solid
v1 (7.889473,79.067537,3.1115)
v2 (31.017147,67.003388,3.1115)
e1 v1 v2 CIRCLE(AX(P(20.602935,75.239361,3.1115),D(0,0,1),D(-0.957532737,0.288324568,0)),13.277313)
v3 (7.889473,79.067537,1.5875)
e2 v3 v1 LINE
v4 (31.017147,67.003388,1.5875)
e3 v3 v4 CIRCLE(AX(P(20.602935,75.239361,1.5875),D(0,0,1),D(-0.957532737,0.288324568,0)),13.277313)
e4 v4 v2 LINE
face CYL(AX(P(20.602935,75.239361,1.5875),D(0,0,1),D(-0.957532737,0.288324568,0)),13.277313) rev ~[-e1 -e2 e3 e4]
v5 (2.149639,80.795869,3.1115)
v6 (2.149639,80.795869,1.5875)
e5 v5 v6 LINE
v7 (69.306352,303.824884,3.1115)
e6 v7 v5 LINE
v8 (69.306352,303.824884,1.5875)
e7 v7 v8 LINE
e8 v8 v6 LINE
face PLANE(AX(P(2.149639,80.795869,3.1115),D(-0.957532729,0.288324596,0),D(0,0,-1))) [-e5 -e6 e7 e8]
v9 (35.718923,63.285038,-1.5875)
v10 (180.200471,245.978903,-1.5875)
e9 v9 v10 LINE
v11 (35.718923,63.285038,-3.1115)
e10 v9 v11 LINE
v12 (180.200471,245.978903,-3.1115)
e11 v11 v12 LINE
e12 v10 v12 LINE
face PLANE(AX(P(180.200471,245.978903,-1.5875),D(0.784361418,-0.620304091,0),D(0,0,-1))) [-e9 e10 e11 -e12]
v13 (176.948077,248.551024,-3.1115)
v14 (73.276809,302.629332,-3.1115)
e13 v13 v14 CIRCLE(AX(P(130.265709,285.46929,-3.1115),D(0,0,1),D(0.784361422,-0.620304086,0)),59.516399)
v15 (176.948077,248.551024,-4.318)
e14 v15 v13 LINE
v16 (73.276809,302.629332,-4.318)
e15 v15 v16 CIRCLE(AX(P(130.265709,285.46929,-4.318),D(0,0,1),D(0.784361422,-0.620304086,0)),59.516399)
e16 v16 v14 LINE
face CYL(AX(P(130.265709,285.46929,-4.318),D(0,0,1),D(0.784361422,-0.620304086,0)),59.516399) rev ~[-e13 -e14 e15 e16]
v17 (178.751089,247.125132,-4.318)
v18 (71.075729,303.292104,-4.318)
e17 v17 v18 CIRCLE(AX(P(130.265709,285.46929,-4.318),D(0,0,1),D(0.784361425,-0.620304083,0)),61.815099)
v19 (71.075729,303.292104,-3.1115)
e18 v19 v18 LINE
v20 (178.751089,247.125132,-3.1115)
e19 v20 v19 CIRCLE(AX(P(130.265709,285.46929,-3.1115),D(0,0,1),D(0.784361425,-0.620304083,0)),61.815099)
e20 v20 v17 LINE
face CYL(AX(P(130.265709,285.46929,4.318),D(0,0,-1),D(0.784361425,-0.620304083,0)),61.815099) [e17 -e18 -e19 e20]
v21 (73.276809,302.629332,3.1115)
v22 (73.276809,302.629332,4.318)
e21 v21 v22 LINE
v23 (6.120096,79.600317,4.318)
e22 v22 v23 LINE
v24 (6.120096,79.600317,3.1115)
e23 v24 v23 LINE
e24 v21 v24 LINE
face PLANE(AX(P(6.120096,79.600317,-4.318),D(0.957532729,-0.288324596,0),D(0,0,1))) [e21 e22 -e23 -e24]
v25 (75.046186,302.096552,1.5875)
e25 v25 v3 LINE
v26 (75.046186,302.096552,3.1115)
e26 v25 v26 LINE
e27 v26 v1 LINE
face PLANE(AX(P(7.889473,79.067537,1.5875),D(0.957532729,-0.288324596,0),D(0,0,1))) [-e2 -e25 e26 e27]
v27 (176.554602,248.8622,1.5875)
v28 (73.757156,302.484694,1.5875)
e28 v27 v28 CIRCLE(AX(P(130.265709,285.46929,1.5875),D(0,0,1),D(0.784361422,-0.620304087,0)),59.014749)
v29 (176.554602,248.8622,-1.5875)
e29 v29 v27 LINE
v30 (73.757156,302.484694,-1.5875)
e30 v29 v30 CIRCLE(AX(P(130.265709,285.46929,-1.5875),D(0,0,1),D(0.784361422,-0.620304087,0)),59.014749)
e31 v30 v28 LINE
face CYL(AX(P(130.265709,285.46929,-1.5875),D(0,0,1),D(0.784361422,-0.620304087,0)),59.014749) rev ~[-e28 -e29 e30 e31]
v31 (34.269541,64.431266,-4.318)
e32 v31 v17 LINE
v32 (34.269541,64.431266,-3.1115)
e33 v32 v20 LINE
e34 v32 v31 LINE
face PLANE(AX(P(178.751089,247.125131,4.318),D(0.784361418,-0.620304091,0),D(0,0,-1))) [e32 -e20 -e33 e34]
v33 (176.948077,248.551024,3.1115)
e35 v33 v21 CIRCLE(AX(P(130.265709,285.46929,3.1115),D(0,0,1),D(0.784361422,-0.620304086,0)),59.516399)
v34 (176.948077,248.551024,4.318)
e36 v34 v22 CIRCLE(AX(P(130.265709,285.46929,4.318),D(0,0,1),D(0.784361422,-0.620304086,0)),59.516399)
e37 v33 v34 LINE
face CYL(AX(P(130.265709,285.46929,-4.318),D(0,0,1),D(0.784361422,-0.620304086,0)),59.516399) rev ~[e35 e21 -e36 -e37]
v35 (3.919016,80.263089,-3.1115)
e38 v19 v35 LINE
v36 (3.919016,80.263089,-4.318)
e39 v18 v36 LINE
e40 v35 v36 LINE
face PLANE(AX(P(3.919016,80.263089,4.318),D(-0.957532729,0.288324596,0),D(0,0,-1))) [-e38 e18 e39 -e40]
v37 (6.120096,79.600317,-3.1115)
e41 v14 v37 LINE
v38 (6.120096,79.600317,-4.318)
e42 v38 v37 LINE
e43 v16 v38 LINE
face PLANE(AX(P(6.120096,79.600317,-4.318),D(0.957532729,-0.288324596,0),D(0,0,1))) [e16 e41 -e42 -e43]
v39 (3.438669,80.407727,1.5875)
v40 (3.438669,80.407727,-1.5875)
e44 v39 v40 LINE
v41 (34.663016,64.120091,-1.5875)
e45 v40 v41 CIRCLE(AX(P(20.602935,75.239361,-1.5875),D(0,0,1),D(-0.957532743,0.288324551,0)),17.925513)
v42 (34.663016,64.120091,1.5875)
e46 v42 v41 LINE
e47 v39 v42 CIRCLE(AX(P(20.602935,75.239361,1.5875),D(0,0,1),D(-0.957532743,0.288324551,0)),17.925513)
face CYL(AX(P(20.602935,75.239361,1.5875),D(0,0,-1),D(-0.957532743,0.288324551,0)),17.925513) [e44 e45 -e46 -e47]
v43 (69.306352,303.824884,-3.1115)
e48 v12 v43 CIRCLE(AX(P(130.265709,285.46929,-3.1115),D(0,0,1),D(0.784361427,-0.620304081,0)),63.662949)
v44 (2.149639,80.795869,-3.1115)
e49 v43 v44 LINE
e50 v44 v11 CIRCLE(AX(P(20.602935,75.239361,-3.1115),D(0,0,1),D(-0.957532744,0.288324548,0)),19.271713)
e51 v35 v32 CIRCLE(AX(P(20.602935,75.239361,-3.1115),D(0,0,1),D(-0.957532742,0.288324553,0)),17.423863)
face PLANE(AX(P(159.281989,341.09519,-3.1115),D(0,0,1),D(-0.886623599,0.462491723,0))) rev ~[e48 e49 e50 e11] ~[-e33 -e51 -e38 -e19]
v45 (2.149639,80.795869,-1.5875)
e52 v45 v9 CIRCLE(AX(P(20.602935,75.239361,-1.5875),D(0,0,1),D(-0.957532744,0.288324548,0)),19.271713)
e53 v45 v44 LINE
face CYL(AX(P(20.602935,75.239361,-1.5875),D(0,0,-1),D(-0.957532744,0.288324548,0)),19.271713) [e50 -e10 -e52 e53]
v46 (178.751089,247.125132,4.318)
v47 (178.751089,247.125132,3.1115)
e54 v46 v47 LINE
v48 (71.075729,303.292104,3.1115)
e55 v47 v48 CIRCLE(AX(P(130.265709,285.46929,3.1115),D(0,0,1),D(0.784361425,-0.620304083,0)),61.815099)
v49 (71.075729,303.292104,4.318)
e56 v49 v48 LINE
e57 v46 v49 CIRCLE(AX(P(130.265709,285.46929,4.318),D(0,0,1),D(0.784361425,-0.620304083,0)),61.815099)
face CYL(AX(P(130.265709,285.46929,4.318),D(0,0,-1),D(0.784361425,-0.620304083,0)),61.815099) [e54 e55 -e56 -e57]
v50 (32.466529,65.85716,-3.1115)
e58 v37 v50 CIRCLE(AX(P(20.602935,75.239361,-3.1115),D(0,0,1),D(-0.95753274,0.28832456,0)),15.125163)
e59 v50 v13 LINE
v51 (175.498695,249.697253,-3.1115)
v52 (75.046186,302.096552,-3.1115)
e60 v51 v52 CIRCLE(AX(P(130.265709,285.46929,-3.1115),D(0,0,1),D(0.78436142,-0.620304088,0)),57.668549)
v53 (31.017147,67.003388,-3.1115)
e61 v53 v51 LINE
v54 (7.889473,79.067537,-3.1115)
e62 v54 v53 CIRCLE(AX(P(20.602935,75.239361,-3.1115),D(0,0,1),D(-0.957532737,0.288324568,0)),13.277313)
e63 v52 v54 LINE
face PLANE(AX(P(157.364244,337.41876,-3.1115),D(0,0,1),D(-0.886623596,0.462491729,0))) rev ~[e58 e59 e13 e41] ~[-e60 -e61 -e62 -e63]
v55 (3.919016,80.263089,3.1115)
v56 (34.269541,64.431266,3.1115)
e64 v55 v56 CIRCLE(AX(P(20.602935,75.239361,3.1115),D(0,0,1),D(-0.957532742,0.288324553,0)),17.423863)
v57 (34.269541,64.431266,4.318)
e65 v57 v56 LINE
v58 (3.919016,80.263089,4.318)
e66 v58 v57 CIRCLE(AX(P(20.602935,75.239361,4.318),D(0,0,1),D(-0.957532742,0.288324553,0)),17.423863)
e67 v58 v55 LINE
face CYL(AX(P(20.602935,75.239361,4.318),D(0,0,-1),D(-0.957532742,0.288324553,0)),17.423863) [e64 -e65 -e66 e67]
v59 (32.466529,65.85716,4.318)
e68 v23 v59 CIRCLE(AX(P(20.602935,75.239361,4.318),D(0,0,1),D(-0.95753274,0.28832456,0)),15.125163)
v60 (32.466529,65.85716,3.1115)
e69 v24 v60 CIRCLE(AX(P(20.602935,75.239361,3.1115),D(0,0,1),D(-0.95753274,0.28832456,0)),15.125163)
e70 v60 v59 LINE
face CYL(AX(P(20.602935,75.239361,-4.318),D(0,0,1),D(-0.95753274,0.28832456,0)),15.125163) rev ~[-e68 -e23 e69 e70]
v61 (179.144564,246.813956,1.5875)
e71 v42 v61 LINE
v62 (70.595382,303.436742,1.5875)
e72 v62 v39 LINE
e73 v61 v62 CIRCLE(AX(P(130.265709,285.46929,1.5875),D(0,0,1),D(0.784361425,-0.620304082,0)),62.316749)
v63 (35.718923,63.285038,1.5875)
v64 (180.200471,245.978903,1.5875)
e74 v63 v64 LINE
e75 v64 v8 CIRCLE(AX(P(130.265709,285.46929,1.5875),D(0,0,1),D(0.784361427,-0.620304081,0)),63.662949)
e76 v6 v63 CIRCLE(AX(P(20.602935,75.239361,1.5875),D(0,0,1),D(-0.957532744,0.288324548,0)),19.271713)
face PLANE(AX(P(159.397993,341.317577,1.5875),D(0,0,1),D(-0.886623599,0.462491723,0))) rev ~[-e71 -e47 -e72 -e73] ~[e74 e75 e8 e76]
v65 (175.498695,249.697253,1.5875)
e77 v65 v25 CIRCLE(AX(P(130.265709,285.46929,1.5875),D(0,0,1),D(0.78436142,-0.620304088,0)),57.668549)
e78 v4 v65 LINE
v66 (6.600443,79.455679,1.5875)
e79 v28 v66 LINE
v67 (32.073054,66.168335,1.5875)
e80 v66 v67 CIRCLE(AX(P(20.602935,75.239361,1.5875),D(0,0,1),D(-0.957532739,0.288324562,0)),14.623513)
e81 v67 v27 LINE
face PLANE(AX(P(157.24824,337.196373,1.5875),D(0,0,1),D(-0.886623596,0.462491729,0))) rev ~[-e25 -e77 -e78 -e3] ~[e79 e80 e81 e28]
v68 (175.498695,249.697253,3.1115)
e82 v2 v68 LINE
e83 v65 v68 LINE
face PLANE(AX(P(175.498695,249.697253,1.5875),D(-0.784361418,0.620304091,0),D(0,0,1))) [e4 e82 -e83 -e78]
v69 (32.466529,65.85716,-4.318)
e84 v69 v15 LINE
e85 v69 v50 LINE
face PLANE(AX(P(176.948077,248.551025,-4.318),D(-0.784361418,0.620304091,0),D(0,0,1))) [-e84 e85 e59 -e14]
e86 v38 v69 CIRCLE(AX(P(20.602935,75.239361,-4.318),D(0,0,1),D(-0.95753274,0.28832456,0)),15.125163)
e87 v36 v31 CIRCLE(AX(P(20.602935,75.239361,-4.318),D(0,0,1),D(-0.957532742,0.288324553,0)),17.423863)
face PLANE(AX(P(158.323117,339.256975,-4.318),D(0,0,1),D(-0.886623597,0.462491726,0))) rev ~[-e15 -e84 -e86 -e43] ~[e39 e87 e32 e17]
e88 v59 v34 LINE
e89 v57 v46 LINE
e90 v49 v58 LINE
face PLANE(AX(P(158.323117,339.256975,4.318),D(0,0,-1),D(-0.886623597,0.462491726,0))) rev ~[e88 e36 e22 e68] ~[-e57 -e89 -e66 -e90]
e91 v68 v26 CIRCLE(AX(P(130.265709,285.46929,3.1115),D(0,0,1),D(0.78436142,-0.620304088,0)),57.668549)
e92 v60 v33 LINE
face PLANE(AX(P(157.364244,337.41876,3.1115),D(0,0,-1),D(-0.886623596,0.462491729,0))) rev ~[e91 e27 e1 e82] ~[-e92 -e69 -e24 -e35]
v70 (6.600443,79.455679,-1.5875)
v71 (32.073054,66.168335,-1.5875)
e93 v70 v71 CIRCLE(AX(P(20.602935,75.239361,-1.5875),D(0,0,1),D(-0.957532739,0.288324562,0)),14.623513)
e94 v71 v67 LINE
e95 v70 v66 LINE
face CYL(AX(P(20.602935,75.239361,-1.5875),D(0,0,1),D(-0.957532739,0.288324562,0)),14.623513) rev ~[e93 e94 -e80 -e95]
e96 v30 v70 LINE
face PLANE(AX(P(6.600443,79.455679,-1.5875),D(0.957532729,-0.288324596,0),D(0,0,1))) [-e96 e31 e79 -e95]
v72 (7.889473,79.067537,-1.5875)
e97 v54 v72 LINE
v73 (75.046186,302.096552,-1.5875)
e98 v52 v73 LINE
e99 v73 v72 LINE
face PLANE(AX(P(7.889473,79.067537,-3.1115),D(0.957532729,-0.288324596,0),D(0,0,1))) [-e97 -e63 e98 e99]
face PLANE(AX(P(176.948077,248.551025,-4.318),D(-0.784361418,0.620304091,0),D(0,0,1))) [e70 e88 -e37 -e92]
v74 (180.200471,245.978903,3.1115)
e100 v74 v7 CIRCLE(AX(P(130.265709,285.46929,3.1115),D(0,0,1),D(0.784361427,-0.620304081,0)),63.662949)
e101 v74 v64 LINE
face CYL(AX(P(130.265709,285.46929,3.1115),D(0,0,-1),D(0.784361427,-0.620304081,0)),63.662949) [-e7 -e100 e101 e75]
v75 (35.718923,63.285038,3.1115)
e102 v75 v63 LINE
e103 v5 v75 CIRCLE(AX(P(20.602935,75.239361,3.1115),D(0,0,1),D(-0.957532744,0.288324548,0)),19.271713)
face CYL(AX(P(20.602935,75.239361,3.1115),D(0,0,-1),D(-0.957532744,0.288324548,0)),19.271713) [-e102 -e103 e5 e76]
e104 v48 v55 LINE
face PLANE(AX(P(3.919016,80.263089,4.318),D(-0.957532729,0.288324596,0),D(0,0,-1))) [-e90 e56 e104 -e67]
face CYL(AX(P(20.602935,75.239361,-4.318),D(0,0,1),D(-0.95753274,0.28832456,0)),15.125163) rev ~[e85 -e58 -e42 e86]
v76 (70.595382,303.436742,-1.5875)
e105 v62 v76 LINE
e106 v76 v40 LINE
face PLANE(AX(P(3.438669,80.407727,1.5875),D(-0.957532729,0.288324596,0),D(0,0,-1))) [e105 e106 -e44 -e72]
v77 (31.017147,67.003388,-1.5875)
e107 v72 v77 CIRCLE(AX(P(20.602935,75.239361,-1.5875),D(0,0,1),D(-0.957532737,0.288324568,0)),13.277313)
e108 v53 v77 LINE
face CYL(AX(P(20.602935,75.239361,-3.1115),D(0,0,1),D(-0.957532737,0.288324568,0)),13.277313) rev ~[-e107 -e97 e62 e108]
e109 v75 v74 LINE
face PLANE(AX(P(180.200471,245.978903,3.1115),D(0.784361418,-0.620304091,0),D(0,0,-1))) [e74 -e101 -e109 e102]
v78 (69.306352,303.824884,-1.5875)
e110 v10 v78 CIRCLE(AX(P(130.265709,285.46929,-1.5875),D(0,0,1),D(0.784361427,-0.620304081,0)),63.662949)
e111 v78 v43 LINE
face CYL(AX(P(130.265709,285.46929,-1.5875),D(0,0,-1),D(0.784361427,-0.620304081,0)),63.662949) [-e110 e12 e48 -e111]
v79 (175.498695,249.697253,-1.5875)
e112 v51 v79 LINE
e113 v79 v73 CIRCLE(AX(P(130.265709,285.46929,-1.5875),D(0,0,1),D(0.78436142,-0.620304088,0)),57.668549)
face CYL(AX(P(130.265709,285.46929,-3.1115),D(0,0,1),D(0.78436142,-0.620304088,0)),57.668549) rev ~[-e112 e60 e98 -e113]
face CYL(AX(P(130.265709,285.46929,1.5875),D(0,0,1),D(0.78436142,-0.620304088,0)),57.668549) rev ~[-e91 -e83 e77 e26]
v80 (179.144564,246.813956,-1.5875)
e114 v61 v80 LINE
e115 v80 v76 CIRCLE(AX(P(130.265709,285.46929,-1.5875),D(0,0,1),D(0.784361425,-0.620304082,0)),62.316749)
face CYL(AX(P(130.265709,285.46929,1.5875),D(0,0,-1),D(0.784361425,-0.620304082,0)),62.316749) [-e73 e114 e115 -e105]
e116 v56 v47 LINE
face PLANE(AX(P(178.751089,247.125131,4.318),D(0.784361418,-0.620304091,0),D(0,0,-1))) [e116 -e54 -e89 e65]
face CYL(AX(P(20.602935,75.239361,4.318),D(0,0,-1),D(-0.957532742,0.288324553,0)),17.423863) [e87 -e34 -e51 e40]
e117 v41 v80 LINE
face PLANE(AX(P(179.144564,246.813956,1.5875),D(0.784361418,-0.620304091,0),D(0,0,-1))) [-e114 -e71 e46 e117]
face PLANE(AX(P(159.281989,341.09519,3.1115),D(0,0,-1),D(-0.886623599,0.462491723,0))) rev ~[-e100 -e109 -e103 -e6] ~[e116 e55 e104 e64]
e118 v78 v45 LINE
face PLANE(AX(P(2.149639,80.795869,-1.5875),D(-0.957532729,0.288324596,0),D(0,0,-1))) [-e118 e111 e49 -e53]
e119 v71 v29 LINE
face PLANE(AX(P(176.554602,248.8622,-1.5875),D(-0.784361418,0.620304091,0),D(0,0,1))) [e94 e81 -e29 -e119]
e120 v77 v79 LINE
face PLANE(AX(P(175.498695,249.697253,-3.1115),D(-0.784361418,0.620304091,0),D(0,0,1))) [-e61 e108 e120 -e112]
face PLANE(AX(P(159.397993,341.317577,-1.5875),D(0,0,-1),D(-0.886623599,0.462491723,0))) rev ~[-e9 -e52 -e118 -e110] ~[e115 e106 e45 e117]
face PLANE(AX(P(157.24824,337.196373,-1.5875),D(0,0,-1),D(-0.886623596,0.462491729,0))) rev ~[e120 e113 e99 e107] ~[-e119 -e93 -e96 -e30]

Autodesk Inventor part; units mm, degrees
ref_plane "Work Plane2" through (20.602935, 75.239361, 0) normal (-1, 0, 0) x (0, 0, 1)
ref_plane "Work Plane3" through (130.265709, 285.46929, 0) normal (-0.3453892, -0.9384595, 0) x (0, 0, 1)
sketch "Path" plane through (0, 0, 0) normal (0, 0, 1) x (1, 0, 0)
  arc A0 (5.019556, 79.931703) -> (33.368035, 65.144213) centre (20.602935, 75.239361) ccw
  arc A1 (177.849583, 247.838078) -> (72.176269, 302.960718) centre (130.265709, 285.46929) ccw
  line L0 (177.849583, 247.838078) -> (33.368035, 65.144213)
  line L1 (5.019556, 79.931703) -> (72.176269, 302.960718)
  dimension "d31" = 5.9944
ref_plane "Section Plane" through (33.368035, 65.144213, 0) normal (0.6203041, 0.7843614, 0) x (0, 0, 1)
sketch "Section Sketch" plane through (33.368035, 65.144213, 0) normal (0.6203041, 0.7843614, 0) x (0, 0, 1)
  line L0 (-4.318, -1.14935) -> (4.318, -1.14935)
  line L1 (4.318, -1.14935) -> (4.318, 1.14935)
  line L2 (4.318, 1.14935) -> (-4.318, 1.14935)
  line L3 (-4.318, 1.14935) -> (-4.318, -1.14935)
  line L4 (-1.5875, -1.651) -> (1.5875, -1.651)
  line L5 (1.5875, -1.651) -> (1.5875, 1.651)
  line L6 (1.5875, 1.651) -> (-1.5875, 1.651)
  line L7 (-1.5875, 1.651) -> (-1.5875, -1.651)
  line L8 (-1.5875, 0) -> (1.5875, 0) construction
  line L9 (-3.1115, -2.9972) -> (-1.5875, -2.9972)
  line L10 (-1.5875, -2.9972) -> (-1.5875, 2.9972)
  line L11 (-1.5875, 2.9972) -> (-3.1115, 2.9972)
  line L12 (-3.1115, 2.9972) -> (-3.1115, -2.9972)
  line L13 (1.5875, -2.9972) -> (3.1115, -2.9972)
  line L14 (3.1115, -2.9972) -> (3.1115, 2.9972)
  line L15 (3.1115, 2.9972) -> (1.5875, 2.9972)
  line L16 (1.5875, 2.9972) -> (1.5875, -2.9972)
  line L17 (-4.318, 0) -> (4.318, 0) construction
  point P0 (0, 0)
  point P1 (0, 0)
  dimension "d21" = 2.2987
  dimension "d22" = 3.302
  dimension "d23" = 3.175
  dimension "d24" = 1.524
  dimension "d31" = 5.9944
  dimension "d32" = 8.636
sweep "Solid" add profiles "Section Sketch" path "Path"
pattern_of_one "Strand Pattern"
equation "\"d21\" = da_d2"
equation "\"d22\" = da_d1"
equation "\"d23\" = da_b1"
equation "\"d24\" = da_t1 + da_t2"
equation "\"d30\" = da_pt"
equation "\"da_p\" = 6.35"
equation "\"da_b1\" = 3.175"
equation "\"da_h2\" = 5.9944"
equation "\"da_h3\" = 5.207"
equation "\"da_d1\" = 3.302"
equation "\"da_d2\" = 2.2987"
equation "\"da_pt\" = 6.4008"
equation "\"da_b\" = 8.636"
equation "\"da_t1\" = 0.762"
equation "\"da_t2\" = 0.762"
properties part number "Roller Chain"
